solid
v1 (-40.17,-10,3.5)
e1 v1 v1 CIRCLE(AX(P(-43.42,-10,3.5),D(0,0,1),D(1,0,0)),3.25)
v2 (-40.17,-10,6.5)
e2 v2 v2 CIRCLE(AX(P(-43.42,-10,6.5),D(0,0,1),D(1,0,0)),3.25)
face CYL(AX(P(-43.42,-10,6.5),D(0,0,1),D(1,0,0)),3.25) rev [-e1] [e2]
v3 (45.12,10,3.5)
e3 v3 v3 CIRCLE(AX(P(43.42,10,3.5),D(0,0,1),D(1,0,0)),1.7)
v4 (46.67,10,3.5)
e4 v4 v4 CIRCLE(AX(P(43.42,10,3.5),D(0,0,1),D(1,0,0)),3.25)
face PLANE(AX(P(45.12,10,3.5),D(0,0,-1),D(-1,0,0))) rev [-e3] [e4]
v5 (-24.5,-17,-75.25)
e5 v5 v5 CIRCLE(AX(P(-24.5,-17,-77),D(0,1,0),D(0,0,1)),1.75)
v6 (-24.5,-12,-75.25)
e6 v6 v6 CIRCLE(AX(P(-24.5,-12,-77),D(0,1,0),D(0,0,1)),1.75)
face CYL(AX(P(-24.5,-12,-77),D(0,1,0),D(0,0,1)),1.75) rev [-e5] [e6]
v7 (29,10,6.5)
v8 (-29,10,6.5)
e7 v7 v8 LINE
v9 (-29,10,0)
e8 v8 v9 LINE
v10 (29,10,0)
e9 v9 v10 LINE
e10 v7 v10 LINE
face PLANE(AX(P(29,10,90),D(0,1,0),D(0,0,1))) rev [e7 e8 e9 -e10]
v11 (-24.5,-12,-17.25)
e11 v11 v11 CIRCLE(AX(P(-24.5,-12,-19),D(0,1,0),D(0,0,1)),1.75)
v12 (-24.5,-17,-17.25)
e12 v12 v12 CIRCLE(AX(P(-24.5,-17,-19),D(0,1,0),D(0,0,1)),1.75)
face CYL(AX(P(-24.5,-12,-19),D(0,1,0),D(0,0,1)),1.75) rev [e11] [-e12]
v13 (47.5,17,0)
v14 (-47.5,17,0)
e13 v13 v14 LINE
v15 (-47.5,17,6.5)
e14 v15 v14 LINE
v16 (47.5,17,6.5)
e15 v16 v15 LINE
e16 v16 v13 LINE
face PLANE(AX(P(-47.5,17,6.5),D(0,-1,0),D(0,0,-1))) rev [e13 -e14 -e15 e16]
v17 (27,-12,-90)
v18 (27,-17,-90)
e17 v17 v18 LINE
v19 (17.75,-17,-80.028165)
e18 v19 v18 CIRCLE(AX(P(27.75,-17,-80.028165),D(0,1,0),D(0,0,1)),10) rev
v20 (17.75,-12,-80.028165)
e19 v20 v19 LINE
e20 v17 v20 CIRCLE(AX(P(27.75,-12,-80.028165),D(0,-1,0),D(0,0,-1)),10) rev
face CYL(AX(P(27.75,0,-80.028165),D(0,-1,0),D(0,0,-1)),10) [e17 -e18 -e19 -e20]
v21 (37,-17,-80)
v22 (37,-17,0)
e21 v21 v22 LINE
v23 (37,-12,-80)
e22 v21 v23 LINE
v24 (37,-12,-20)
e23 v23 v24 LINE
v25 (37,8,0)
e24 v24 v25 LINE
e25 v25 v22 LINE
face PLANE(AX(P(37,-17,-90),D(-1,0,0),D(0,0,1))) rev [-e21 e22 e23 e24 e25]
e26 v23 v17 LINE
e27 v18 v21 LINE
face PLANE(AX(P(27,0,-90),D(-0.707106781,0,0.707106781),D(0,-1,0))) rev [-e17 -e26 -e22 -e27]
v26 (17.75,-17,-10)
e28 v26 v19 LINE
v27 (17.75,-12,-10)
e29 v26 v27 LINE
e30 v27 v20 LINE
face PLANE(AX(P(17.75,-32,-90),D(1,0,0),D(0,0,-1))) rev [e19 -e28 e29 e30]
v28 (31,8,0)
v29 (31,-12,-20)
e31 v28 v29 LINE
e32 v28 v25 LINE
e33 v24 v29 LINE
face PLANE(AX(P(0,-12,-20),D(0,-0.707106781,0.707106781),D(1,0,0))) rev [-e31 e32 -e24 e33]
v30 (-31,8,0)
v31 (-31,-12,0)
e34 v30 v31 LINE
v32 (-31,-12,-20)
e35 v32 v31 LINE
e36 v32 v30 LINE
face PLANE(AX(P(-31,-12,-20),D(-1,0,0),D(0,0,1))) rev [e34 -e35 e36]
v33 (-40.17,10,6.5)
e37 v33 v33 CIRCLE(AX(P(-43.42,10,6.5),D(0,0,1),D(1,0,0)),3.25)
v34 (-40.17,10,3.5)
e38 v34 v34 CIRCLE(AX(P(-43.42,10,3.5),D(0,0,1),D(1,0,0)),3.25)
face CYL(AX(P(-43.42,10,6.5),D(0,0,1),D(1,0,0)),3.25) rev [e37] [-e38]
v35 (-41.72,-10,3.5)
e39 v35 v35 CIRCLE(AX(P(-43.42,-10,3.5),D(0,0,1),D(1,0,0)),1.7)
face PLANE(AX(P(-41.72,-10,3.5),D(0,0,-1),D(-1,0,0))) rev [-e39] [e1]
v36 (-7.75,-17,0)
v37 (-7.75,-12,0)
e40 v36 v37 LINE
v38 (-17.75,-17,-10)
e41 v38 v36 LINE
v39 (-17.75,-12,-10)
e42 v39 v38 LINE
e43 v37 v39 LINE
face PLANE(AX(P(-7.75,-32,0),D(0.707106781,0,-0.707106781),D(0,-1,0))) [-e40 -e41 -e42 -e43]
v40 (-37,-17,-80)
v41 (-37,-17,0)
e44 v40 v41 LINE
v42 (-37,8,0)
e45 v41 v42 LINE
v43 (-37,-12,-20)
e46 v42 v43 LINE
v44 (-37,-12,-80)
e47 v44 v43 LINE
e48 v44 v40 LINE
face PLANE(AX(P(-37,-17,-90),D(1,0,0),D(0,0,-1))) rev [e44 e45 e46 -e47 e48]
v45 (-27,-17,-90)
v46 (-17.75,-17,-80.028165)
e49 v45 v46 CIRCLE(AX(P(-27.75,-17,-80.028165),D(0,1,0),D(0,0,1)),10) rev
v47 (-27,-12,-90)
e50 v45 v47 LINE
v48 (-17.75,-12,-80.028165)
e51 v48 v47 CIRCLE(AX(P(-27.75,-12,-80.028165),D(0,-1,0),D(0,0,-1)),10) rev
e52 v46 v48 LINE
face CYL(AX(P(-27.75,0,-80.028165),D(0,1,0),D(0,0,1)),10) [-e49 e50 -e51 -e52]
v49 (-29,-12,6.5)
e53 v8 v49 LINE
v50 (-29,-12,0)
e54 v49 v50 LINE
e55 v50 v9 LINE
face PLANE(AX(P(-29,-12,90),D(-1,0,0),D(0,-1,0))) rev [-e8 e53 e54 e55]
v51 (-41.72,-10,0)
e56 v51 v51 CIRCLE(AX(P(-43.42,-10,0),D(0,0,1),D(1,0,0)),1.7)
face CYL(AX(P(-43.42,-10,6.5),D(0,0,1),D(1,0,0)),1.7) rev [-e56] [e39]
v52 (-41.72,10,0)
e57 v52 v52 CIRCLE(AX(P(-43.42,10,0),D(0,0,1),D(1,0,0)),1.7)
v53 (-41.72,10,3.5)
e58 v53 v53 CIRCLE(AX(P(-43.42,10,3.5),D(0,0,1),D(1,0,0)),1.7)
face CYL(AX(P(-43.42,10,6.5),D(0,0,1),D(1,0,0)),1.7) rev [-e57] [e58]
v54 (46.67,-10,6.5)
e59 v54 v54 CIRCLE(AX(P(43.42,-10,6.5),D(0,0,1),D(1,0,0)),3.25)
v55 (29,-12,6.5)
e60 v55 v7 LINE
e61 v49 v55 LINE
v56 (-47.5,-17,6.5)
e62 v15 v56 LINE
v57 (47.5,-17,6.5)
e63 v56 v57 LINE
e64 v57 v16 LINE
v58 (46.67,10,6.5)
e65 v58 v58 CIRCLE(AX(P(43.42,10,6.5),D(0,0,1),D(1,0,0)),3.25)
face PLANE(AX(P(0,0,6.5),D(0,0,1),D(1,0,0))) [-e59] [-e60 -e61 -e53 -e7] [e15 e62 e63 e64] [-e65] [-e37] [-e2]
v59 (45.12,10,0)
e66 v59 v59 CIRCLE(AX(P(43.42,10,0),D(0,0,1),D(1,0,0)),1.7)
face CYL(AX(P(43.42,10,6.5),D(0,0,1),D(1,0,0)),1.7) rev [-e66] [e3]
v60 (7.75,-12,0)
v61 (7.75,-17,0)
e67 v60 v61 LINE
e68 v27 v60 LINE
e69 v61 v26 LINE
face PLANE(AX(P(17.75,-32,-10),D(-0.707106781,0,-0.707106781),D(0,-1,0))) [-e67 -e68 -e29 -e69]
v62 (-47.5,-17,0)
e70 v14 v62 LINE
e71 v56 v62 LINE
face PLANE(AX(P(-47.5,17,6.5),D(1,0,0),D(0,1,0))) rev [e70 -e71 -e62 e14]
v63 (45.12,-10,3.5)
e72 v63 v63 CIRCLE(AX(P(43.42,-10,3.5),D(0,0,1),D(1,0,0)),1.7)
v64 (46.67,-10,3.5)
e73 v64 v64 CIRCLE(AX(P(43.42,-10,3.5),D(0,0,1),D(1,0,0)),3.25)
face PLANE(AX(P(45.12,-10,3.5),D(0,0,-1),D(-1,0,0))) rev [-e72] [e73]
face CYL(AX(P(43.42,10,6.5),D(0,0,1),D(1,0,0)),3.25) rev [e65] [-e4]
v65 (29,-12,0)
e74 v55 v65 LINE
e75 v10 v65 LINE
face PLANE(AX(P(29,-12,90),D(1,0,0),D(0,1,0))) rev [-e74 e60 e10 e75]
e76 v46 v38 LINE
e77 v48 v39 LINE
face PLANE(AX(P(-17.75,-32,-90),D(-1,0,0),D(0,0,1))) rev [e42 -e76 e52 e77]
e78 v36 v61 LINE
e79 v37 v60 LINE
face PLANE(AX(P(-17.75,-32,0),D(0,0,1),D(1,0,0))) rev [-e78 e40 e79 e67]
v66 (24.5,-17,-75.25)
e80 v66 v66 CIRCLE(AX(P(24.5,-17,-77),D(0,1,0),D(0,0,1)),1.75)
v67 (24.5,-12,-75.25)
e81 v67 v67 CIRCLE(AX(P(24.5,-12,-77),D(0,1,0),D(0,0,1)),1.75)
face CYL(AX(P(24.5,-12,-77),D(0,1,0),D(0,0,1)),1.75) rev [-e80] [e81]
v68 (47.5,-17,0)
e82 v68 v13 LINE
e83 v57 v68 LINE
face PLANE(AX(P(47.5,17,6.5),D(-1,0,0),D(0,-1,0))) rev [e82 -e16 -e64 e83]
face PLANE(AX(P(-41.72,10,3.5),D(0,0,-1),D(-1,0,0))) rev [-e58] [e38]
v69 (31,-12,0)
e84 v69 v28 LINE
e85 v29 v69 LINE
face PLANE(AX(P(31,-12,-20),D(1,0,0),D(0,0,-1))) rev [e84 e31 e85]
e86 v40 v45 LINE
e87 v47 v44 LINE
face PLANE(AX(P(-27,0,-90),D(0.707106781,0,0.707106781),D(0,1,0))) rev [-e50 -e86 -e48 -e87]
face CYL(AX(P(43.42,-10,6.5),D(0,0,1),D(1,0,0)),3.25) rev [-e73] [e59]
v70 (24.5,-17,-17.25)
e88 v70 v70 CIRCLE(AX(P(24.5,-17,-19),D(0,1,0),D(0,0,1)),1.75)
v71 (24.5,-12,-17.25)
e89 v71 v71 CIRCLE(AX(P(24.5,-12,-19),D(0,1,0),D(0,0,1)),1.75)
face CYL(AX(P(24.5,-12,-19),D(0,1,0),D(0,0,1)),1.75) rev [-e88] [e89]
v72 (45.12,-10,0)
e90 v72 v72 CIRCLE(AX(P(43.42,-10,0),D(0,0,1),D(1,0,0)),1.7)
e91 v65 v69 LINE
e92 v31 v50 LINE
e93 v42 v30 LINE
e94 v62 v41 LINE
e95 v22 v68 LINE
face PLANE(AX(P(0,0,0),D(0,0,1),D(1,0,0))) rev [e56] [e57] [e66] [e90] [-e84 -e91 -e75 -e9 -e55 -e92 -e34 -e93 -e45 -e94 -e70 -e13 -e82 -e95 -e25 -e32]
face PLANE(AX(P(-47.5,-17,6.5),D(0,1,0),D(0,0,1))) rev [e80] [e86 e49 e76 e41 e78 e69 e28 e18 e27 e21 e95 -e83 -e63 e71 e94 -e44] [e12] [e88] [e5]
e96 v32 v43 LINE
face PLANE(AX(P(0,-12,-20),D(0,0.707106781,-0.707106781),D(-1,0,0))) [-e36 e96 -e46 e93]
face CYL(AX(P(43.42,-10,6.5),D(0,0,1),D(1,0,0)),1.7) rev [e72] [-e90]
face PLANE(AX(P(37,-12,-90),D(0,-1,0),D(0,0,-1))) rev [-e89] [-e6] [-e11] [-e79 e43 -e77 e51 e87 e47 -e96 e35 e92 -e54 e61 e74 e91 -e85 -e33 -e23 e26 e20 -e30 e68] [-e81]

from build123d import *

# Parameters (mm, degrees)
SKETCH1_W                      = 95
SKETCH1_H                      = 34
BOSS_EXTRUDE1_DEPTH            = 6.5
SKETCH2_W                      = 74
SKETCH2_H                      = 5
BOSS_EXTRUDE2_DEPTH            = 90
SKETCH3_W                      = 58
SKETCH3_H                      = 22
CUT_EXTRUDE1_DEPTH             = 90
CBORE_FOR_M3_SHCS1_D           = 3.4
CBORE_FOR_M3_SHCS1_DEPTH       = 10.1
CBORE_FOR_M3_SHCS1_CBORE_D     = 6.5
CBORE_FOR_M3_SHCS1_CBORE_DEPTH = 3
CBORE_FOR_M3_SHCS1_TIP         = 1.021463052
SKETCH7_W                      = 6
SKETCH7_H                      = 20
BOSS_EXTRUDE3_DEPTH            = 20
CHAMFER1_SIZE                  = 20
F_1_0_3_5_DIAMETER_HOLE1_D     = 3.5
F_1_0_3_5_DIAMETER_HOLE1_DEPTH = 10.1
F_1_0_3_5_DIAMETER_HOLE1_TIP   = 1.051506083
SKETCH12_W                     = 35.5
SKETCH12_H                     = 90
CUT_EXTRUDE2_DEPTH             = 20
CHAMFER2_SIZE                  = 10
FILLET1_R                      = 10


# Some blends are built 0.0001 mm under size
with BuildPart() as part:
    # Sketch1 → Boss-Extrude1 (new body)
    with BuildSketch(Plane.XY):
        Rectangle(SKETCH1_W, SKETCH1_H)
    extrude(amount=BOSS_EXTRUDE1_DEPTH)

    # Sketch2 → Boss-Extrude2 (add)
    with BuildSketch(Plane(origin=(0, 0, 0), x_dir=(-1, 0, 0), z_dir=(0, 0, -1))):
        with Locations((0, -14.5)):
            Rectangle(SKETCH2_W, SKETCH2_H)
    extrude(amount=BOSS_EXTRUDE2_DEPTH)

    # Sketch3 → Cut-Extrude1 (cut)
    with BuildSketch(Plane(origin=(0, 0, 0), x_dir=(-1, 0, 0), z_dir=(0, 0, -1))):
        with Locations((0, -1)):
            Rectangle(SKETCH3_W, SKETCH3_H)
    extrude(amount=-CUT_EXTRUDE1_DEPTH, mode=Mode.SUBTRACT)

    # CBORE for M3 SHCS1
    with Locations(Plane.XY.offset(6.5)):
        with Locations((-43.42, 10), (-43.42, -10), (43.42, 10), (43.42, -10)):
            CounterBoreHole(CBORE_FOR_M3_SHCS1_D / 2, CBORE_FOR_M3_SHCS1_CBORE_D / 2, CBORE_FOR_M3_SHCS1_CBORE_DEPTH, depth=CBORE_FOR_M3_SHCS1_DEPTH)
            with Locations((0, 0, -(CBORE_FOR_M3_SHCS1_DEPTH + CBORE_FOR_M3_SHCS1_TIP / 2))):  # 118° drill point
                Cone(0, CBORE_FOR_M3_SHCS1_D / 2, CBORE_FOR_M3_SHCS1_TIP, mode=Mode.SUBTRACT)

    # Sketch7 → Boss-Extrude3 (add)
    with BuildSketch(Plane(origin=(0, 0, 0), x_dir=(-1, 0, 0), z_dir=(0, 0, -1))):
        with Locations((-34, -2)):
            Rectangle(SKETCH7_W, SKETCH7_H)
        with Locations((34, -2)):
            Rectangle(SKETCH7_W, SKETCH7_H)
    extrude(amount=BOSS_EXTRUDE3_DEPTH)

    # Chamfer1
    chamfer1_edges = [part.edges().sort_by_distance(p)[0] for p in [
        (34, 8, -20),
        (-34, 8, -20),
    ]]
    chamfer(chamfer1_edges, length=CHAMFER1_SIZE - 0.0001)  # a hair under: the kernel refuses the full size

    # Ø1.0 (3.5) Diameter Hole1
    with Locations(Plane(origin=(0, -12, 0), x_dir=(1, 0, 0), z_dir=(0, 1, 0))):
        with Locations((-24.5, 77), (24.5, 77), (-24.5, 19), (24.5, 19)):
            Hole(F_1_0_3_5_DIAMETER_HOLE1_D / 2, depth=F_1_0_3_5_DIAMETER_HOLE1_DEPTH)
            with Locations((0, 0, -(F_1_0_3_5_DIAMETER_HOLE1_DEPTH + F_1_0_3_5_DIAMETER_HOLE1_TIP / 2))):  # 118° drill point
                Cone(0, F_1_0_3_5_DIAMETER_HOLE1_D / 2, F_1_0_3_5_DIAMETER_HOLE1_TIP, mode=Mode.SUBTRACT)

    # Sketch12 → Cut-Extrude2 (cut)
    with BuildSketch(Plane(origin=(0, -12, 0), x_dir=(1, 0, 0), z_dir=(0, 1, 0))):
        with Locations((0, 45)):
            Rectangle(SKETCH12_W, SKETCH12_H)
    extrude(amount=-CUT_EXTRUDE2_DEPTH, mode=Mode.SUBTRACT)

    # Chamfer2
    chamfer2_edges = [part.edges().sort_by_distance(p)[0] for p in [
        (17.75, -14.5, 0),
        (-17.75, -14.5, 0),
        (37, -14.5, -90),
        (-37, -14.5, -90),
    ]]
    chamfer(chamfer2_edges, length=CHAMFER2_SIZE)

    # Fillet1
    # the kernel refuses this fillet: 10 mm, written as the material it takes off along each edge
    with BuildSketch(Plane(origin=(-17.75, 12.929588344, -90), x_dir=(0, 0, 1), z_dir=(0, -1, 0))) as fillet1_piece_1:
        with BuildLine():
            CenterArc((9.971835338, 10), FILLET1_R, 184.301222305, 85.698777695)
            Line((0, 9.25), (-0.199436707, 9.235))
            ThreePointArc((-0.199436707, 9.235), (-0.2, 4.625), (-0.2, 0))
            Line((-0.2, 0), (0, -0.2))
            Line((0, -0.2), (9.971835338, -0.2))
            Line((9.971835338, -0.2), (9.971835338, 0))
        make_face()
    extrude(amount=54.859176688, mode=Mode.SUBTRACT)
    with BuildSketch(Plane(origin=(17.75, 12.929588344, -90), x_dir=(1, 0, 0), z_dir=(0, -1, 0))) as fillet1_piece_2:
        with BuildLine():
            CenterArc((10, 9.971835338), FILLET1_R, 180, 85.698777695)
            Line((0, 9.971835338), (-0.2, 9.971835338))
            Line((-0.2, 9.971835338), (-0.2, 0))
            Line((-0.2, 0), (0, -0.2))
            ThreePointArc((0, -0.2), (4.625, -0.2), (9.235, -0.199436707))
            Line((9.235, -0.199436707), (9.25, 0))
        make_face()
    extrude(amount=54.859176688, mode=Mode.SUBTRACT)


solid = part.part
